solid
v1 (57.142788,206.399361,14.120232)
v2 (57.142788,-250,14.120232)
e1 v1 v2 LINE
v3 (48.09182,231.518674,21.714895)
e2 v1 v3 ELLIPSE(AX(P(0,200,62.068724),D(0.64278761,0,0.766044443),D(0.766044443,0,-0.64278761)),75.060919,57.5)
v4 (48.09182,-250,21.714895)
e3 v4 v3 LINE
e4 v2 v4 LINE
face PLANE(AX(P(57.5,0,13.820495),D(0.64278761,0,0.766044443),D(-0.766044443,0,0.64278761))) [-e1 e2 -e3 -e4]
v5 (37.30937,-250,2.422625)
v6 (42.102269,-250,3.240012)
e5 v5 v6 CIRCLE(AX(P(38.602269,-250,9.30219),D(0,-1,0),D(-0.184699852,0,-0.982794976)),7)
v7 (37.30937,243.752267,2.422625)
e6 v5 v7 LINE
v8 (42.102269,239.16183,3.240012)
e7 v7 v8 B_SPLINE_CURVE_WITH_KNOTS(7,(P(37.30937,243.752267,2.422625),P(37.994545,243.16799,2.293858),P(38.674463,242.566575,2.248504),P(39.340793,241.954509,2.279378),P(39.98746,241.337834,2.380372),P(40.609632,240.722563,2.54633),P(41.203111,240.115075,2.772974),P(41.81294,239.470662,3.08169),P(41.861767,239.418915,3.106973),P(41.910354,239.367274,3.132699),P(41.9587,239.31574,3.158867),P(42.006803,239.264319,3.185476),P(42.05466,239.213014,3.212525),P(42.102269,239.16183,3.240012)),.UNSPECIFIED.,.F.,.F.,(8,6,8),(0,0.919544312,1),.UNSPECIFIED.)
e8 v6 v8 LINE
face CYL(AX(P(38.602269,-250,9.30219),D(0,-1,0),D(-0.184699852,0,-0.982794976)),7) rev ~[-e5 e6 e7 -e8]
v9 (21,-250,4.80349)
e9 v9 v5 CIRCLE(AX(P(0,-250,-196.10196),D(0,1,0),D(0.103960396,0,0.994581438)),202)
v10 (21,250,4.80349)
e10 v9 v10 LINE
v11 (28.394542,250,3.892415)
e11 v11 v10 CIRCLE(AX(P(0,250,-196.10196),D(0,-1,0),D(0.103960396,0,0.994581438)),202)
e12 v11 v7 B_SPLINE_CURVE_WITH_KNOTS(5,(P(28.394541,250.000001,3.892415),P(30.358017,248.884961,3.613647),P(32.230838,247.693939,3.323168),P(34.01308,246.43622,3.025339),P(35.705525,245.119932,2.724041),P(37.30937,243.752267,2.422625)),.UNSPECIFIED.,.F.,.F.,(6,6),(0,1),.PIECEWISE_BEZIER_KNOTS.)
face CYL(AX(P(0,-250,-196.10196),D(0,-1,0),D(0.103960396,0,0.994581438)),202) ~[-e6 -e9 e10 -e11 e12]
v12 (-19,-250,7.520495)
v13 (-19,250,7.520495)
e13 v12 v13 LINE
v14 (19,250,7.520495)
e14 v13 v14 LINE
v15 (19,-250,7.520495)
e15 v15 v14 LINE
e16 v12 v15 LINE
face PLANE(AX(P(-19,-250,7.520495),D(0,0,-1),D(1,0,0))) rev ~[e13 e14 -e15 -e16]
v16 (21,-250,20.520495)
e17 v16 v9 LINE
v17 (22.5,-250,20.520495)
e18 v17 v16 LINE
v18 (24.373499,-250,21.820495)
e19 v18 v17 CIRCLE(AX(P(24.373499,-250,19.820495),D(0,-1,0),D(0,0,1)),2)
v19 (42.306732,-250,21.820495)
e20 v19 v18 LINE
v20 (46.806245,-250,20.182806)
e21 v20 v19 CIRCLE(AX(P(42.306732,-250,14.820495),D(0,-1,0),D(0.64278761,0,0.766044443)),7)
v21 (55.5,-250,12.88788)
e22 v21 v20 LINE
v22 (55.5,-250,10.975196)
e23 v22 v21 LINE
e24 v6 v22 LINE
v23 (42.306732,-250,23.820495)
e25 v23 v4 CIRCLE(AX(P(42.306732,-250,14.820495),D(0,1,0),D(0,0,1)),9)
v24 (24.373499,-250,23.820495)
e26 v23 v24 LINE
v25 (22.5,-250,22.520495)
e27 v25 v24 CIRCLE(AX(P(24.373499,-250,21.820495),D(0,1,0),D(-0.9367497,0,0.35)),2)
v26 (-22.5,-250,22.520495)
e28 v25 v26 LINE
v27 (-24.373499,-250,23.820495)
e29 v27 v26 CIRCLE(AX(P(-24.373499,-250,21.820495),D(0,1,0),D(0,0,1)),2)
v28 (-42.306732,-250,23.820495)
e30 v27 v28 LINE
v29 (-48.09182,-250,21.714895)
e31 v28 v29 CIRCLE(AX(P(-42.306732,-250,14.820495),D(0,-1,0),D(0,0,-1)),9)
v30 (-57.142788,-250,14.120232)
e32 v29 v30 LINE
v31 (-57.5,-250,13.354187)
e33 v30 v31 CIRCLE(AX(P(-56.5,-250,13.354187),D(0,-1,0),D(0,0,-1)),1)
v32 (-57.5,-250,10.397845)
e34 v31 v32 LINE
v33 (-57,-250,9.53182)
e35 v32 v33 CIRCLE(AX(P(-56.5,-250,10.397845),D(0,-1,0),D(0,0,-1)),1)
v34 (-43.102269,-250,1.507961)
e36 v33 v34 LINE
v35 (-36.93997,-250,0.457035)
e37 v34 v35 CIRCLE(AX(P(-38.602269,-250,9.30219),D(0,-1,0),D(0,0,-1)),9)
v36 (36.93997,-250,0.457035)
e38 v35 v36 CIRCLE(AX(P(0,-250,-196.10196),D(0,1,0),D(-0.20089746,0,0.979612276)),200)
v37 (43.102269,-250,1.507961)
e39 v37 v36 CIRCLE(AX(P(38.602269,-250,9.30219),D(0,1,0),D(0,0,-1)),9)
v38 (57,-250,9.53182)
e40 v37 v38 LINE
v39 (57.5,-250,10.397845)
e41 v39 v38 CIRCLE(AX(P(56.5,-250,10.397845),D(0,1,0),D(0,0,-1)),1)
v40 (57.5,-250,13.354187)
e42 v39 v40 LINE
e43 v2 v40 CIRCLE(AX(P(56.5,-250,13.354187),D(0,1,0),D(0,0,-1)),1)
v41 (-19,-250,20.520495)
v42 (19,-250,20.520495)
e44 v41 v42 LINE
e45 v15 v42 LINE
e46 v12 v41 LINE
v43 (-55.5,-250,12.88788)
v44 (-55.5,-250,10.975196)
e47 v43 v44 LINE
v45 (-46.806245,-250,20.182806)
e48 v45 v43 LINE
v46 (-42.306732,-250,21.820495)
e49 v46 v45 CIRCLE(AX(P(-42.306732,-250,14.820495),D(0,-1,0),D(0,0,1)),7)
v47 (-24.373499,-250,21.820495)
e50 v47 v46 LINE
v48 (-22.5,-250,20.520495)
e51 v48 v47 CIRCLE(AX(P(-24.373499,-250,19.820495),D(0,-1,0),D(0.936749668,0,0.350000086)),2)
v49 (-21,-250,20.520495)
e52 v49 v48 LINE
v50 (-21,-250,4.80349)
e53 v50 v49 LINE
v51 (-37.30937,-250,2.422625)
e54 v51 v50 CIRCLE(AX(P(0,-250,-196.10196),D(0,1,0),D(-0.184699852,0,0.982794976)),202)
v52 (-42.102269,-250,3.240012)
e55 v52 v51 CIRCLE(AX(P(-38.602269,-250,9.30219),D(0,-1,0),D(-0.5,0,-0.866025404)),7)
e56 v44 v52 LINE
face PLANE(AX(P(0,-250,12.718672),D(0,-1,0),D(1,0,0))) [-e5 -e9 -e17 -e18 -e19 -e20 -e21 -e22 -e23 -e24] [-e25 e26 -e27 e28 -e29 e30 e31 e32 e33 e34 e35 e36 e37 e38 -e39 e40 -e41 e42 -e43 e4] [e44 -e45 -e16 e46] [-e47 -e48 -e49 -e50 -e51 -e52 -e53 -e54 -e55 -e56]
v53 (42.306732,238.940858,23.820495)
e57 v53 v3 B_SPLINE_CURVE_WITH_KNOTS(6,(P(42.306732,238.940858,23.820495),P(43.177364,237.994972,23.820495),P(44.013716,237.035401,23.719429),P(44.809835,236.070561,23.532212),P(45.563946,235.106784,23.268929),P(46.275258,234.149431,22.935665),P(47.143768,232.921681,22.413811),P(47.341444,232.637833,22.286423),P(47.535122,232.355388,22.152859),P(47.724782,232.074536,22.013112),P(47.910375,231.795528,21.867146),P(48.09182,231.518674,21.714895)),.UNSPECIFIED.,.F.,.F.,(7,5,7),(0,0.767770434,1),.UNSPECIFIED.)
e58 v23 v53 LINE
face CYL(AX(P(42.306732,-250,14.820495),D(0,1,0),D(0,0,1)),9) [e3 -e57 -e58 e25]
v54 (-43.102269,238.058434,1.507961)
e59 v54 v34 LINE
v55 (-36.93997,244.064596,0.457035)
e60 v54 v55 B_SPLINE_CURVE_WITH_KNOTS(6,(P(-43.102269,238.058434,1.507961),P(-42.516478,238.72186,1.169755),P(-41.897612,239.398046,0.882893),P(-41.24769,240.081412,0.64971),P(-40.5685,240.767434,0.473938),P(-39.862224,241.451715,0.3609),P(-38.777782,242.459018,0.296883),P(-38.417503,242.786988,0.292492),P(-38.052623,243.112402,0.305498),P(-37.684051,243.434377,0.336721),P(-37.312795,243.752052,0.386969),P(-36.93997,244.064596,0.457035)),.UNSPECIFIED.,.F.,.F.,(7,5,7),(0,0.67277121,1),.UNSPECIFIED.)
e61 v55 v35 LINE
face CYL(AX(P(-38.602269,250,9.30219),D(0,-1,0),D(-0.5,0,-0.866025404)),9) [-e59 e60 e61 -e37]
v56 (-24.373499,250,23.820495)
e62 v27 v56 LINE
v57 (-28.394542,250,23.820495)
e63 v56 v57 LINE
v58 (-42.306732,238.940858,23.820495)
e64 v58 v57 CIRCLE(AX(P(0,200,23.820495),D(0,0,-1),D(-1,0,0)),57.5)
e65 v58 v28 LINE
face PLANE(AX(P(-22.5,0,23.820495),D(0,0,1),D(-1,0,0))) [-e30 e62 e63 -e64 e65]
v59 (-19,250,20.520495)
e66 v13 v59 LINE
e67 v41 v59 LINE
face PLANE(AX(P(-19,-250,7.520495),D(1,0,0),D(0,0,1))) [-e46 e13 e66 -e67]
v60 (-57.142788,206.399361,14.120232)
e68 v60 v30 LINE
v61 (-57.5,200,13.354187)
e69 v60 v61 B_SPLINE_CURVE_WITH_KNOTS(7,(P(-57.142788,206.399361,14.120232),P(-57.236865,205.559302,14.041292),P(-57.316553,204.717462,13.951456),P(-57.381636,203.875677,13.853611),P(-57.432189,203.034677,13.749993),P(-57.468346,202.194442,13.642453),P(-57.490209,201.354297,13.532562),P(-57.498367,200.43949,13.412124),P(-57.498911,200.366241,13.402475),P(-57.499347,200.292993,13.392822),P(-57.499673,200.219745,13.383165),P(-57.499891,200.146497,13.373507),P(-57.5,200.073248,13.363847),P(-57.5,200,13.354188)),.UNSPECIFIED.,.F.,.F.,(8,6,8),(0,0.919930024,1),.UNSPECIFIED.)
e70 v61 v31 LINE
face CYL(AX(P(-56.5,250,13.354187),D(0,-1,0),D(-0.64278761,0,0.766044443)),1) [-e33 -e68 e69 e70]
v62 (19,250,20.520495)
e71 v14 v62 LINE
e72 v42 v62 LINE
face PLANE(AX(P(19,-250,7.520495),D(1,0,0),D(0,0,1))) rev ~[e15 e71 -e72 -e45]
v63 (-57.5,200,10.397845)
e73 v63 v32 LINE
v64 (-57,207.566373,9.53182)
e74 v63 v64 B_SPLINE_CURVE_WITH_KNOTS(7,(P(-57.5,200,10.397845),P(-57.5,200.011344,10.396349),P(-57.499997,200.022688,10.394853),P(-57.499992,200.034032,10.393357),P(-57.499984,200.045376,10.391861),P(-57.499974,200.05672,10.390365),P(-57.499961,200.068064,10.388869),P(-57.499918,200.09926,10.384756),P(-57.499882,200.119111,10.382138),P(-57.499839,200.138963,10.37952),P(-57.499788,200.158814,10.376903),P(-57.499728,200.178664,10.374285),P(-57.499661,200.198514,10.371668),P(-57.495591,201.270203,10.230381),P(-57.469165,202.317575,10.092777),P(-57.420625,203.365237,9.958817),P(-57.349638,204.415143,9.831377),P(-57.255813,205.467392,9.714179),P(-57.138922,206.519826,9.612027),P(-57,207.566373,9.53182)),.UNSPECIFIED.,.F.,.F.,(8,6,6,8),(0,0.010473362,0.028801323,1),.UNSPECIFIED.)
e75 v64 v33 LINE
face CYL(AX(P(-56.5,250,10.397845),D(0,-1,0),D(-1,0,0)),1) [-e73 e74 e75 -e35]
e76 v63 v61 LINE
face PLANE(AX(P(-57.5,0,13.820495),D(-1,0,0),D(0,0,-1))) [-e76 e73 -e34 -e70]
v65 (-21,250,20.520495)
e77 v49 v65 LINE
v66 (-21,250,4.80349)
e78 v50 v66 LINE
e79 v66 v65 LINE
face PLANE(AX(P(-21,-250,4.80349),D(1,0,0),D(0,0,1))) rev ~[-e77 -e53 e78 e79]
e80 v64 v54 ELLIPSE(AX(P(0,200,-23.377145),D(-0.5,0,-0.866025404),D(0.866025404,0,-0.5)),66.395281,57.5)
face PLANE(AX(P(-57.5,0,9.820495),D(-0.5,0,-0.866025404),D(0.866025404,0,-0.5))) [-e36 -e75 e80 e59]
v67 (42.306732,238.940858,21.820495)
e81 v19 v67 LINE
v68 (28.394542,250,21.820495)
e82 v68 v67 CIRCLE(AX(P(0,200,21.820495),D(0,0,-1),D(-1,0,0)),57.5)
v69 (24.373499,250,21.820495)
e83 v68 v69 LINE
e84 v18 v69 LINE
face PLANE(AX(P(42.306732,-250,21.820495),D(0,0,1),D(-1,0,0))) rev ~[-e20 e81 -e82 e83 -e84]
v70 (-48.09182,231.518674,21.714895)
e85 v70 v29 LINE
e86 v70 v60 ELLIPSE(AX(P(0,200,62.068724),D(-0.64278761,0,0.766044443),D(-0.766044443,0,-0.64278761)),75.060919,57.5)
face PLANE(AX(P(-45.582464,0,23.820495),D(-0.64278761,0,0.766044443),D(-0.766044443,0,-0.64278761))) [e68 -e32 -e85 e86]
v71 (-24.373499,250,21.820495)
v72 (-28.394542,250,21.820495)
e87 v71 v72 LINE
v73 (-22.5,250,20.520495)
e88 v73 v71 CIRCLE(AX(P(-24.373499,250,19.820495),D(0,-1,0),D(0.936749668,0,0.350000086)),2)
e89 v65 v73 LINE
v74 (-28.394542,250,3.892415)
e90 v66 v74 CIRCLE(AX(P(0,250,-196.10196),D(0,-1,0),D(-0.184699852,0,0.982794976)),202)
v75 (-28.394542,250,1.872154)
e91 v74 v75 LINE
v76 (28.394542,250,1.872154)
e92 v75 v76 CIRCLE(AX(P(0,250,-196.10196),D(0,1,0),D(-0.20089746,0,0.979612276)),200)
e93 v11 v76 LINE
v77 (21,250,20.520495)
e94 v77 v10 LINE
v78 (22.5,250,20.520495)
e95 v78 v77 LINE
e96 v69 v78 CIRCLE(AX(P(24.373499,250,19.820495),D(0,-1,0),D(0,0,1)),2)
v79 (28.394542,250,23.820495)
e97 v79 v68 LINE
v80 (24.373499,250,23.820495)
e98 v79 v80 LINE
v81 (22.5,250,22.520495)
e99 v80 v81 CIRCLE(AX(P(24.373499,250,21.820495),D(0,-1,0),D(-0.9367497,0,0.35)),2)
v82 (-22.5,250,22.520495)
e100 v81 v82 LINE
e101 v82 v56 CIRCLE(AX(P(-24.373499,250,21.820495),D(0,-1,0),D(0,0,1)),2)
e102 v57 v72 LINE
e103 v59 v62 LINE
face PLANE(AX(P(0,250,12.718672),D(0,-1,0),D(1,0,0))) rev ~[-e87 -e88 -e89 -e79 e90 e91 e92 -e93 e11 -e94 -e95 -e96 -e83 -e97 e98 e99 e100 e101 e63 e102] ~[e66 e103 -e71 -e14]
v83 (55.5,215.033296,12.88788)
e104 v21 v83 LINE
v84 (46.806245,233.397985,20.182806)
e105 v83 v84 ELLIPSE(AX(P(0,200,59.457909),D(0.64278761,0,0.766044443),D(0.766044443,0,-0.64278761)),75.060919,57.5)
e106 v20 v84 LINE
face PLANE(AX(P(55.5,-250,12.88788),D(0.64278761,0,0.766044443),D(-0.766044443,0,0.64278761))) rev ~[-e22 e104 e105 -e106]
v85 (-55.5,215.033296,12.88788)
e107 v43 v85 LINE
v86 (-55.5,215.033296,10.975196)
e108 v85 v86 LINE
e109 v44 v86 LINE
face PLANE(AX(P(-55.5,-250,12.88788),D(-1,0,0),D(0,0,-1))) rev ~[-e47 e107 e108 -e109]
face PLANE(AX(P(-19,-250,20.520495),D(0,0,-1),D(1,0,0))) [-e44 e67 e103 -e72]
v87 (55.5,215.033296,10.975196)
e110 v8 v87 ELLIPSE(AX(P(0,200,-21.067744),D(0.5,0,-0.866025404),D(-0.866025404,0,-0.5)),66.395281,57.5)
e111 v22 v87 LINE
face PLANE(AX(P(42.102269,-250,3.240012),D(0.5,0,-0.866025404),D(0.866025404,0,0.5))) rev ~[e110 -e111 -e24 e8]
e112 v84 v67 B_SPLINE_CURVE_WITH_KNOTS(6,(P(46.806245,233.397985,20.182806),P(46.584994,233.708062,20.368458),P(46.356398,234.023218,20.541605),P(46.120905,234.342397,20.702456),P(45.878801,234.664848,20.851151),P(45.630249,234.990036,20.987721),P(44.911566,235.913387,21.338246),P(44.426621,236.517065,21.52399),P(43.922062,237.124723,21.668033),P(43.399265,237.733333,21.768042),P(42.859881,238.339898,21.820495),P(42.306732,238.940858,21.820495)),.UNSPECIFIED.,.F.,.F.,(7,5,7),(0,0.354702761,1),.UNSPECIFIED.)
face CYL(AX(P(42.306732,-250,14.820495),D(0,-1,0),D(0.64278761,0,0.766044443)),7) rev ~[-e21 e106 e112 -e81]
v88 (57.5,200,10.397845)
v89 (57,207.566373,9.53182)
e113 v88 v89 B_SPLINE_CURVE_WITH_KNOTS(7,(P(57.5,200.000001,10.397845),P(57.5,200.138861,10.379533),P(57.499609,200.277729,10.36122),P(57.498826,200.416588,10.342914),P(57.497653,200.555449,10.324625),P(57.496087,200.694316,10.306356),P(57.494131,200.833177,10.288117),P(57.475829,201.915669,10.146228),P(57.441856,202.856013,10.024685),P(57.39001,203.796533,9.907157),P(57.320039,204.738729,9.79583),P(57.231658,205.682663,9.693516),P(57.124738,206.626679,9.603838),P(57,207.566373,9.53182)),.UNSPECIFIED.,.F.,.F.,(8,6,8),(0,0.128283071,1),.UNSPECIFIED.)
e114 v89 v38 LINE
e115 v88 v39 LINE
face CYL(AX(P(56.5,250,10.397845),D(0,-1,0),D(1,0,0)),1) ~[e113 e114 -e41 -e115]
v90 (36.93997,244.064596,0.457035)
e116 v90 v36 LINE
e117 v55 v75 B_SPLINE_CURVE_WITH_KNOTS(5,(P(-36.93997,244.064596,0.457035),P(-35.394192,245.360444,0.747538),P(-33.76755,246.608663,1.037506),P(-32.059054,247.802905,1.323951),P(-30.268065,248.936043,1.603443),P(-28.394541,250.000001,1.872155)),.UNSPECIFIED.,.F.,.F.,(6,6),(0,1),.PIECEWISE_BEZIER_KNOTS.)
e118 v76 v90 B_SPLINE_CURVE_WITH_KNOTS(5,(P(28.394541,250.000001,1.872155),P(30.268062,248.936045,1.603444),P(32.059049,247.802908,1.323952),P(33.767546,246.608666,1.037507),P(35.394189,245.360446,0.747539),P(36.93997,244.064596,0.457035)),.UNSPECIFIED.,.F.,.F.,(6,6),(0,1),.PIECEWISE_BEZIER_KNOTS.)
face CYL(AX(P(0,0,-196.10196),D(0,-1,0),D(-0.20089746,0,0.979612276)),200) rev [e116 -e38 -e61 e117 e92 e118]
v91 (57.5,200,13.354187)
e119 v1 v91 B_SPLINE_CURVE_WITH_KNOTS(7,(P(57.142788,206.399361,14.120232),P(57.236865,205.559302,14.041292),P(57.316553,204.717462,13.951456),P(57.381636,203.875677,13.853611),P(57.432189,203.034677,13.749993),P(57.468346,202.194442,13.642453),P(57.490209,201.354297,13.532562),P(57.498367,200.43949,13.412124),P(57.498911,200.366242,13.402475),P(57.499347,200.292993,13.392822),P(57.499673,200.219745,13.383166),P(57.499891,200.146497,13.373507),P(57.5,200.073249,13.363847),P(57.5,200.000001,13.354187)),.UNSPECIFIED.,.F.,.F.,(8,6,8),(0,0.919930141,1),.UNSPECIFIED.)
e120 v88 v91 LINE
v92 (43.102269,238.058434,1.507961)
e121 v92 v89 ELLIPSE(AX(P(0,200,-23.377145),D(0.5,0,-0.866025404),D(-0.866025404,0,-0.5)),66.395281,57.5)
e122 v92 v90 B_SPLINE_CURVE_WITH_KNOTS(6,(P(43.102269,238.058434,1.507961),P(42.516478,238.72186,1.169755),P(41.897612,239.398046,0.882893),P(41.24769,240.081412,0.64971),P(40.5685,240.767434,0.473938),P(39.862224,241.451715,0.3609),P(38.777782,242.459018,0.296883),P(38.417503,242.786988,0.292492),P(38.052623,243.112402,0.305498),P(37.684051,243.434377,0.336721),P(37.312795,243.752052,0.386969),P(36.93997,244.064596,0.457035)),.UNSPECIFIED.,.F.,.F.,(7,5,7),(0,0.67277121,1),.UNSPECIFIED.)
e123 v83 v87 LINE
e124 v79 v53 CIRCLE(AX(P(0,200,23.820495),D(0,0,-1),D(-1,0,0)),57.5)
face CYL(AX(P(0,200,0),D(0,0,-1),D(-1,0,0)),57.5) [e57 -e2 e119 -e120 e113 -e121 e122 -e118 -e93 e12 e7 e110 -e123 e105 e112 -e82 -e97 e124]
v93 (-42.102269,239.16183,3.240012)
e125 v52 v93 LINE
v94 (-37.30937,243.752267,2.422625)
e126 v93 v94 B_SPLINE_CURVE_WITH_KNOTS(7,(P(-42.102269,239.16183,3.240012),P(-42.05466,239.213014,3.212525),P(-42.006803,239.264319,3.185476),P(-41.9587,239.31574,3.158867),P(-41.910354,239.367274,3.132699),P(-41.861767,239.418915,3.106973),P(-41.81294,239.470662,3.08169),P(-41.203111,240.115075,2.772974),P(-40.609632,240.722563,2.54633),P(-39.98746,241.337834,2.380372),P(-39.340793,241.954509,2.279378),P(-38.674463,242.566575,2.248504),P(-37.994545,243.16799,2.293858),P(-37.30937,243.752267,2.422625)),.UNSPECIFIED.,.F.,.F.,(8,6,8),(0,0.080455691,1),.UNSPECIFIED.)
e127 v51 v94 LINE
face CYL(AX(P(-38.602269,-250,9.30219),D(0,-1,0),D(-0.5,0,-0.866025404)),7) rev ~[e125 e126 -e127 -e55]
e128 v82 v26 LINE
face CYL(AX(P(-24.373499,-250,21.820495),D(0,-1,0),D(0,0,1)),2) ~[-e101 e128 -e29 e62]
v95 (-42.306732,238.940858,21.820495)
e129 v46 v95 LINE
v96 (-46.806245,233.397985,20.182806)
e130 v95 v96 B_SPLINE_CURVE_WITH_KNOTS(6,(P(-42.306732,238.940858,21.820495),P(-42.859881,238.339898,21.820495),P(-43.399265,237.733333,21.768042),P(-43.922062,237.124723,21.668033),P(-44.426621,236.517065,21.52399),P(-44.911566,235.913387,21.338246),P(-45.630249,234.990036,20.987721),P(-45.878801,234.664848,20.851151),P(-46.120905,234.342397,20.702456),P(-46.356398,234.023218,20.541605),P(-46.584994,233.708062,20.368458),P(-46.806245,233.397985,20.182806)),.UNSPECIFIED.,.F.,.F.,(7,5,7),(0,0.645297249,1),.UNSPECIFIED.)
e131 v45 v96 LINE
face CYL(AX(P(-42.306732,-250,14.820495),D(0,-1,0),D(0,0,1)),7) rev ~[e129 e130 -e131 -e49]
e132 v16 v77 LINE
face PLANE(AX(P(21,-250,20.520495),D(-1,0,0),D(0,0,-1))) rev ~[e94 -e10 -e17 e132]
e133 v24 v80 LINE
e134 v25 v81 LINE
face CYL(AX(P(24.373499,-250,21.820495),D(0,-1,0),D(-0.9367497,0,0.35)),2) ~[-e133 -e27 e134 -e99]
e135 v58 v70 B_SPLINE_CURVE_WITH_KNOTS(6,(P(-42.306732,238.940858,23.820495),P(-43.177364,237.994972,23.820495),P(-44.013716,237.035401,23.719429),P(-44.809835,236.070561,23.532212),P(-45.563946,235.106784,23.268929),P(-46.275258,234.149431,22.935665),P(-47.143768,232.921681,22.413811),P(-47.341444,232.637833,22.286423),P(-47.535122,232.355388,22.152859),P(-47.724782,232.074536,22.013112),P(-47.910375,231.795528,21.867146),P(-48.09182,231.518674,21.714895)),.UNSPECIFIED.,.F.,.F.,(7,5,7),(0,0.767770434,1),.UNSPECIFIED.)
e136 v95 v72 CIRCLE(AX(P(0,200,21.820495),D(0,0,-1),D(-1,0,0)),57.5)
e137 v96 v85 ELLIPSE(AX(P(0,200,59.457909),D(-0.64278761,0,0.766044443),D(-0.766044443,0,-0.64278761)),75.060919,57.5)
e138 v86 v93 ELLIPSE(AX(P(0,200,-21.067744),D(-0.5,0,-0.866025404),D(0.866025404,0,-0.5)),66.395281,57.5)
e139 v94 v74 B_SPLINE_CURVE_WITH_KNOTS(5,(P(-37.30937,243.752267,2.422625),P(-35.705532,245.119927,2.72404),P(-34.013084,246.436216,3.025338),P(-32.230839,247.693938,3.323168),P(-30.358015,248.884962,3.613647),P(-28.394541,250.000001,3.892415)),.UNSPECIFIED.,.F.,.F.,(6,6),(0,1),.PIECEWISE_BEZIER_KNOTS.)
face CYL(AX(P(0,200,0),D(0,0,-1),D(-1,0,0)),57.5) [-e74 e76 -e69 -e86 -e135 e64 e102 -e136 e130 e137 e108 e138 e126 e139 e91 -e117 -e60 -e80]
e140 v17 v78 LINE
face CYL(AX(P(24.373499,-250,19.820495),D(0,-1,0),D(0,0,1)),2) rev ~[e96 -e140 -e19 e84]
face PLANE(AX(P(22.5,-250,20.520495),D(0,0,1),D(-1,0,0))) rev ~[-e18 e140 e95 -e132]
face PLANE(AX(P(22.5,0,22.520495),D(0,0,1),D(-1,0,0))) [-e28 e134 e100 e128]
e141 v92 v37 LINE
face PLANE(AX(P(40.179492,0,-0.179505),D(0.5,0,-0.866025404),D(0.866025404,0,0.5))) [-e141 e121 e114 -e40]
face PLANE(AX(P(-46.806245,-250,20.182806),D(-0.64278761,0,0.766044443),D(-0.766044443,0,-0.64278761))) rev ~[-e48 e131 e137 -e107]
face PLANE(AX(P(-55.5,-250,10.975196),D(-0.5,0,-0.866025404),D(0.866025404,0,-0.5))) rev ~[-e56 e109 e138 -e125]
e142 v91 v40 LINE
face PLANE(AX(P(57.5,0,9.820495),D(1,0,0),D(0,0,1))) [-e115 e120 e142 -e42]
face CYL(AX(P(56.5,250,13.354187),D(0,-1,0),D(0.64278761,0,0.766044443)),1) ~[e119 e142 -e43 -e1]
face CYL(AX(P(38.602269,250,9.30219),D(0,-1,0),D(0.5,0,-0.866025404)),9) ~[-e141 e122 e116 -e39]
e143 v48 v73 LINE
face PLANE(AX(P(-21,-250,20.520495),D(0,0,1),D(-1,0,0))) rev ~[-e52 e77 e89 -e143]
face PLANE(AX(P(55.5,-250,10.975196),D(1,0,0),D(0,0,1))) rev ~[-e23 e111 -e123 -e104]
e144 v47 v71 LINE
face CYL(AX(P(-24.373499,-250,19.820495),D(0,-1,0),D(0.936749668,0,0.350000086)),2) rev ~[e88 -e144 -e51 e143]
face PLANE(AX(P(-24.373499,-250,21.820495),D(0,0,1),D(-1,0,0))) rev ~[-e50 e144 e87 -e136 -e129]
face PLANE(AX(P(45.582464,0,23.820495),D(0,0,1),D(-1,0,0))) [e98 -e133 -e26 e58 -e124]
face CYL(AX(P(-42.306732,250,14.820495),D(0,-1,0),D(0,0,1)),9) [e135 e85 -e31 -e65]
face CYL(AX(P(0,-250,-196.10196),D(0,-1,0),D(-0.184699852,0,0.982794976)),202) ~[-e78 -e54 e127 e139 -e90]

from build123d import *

# Parameters (mm, degrees)
F1_DEPTH       = 250
F2_W           = 38
F2_H           = 13
F3_DEPTH       = 1200
F5_R           = 9
F6_R           = 1
F9_DEPTH       = 500.001
F11_DEPTH      = 23.8214951236
F11_DEPTH_BACK = 526


# Not quite as in the source:
# - an extrude ends at something that could not be found from the text; its depth is read off the source's solid
# - a feature of the source that left no trace in its solid (it failed there, or was rolled back) is left out


with BuildPart() as f1:
    # F0 (on Front) → F1 (new body, symmetric)
    with BuildSketch(Plane.XZ):
        with BuildLine():
            Line((22.5, 62.3204951236), (0, 62.3204951236))
            Line((0, 62.3204951236), (-22.5, 62.3204951236))
            Line((-22.5, 62.3204951236), (-22.5, 63.6204951236))
            Line((-22.5, 63.6204951236), (-45.5824640741, 63.6204951236))
            Line((-45.5824640741, 63.6204951236), (-57.5, 53.6204951236))
            Line((-57.5, 53.6204951236), (-57.5, 49.6204951236))
            Line((-57.5, 49.6204951236), (-40.1794919243, 39.6204951236))
            ThreePointArc((-40.1794919243, 39.6204951236), (0, 43.698039982), (40.1794919243, 39.6204951236))
            Line((40.1794919243, 39.6204951236), (57.5, 49.6204951236))
            Line((57.5, 49.6204951236), (57.5, 53.6204951236))
            Line((57.5, 53.6204951236), (45.5824640741, 63.6204951236))
            Line((45.5824640741, 63.6204951236), (22.5, 63.6204951236))
            Line((22.5, 63.6204951236), (22.5, 62.3204951236))
        make_face()
    extrude(amount=F1_DEPTH, both=True)

    # F2 (on face) → F3 (cut)
    with BuildSketch(Plane.XZ.offset(250)):
        with Locations((0, 53.8204951236)):
            Rectangle(F2_W, F2_H)
    extrude(amount=-F3_DEPTH, mode=Mode.SUBTRACT)

    # F5
    f5_edges = [f1.edges().sort_by_distance(p)[0] for p in [
        (45.582464, 0, 63.620495),
        (40.179492, 0, 39.620495),
        (-40.179492, 0, 39.620495),
        (-45.582464, 0, 63.620495),
    ]]
    fillet(f5_edges, radius=F5_R)

    # F6
    f6_edges = [f1.edges().sort_by_distance(p)[0] for p in [
        (-57.5, 0, 53.620495),
        (-57.5, 0, 49.620495),
        (57.5, 0, 53.620495),
        (57.5, 0, 49.620495),
    ]]
    fillet(f6_edges, radius=F6_R)


with BuildPart() as f1_1:
    # F7: moved
    add(f1.part.moved(Location((0, 0, -39.8))))

    # F8 (on face) → F9 (cut, through all)
    with BuildSketch(Plane.XZ.offset(250)):
        with BuildLine():
            ThreePointArc((22.5, 22.5204951236), (23.2333239744, 23.4636627961), (24.3734993995, 23.8204951236))
            Line((24.3734993995, 23.8204951236), (22.5, 23.8204951236))
            Line((22.5, 23.8204951236), (22.5, 22.5204951236))
        make_face()
        with BuildLine():
            ThreePointArc((-24.3734993995, 23.8204951236), (-23.2333239744, 23.4636627961), (-22.5, 22.5204951236))
            Line((-22.5, 22.5204951236), (-22.5, 23.8204951236))
            Line((-22.5, 23.8204951236), (-24.3734993995, 23.8204951236))
        make_face()
        with BuildLine():
            ThreePointArc((-42.1022690923, 3.2400121158), (-39.7790673433, 2.4018170628), (-37.3093701274, 2.4226251111))
            ThreePointArc((-37.3093701274, 2.4226251111), (-29.1789785809, 3.779472859), (-21, 4.8034903809))
            Line((-21, 4.8034903809), (-21, 20.5204952508))
            Line((-21, 20.5204952508), (-22.5, 20.5204952508))
            ThreePointArc((-22.5, 20.5204952508), (-23.2333240107, 21.4636628361), (-24.3734993995, 21.8204951236))
            Line((-24.3734993995, 21.8204951236), (-42.3067319657, 21.8204951236))
            ThreePointArc((-42.3067319657, 21.8204951236), (-44.7008729689, 21.3983434691), (-46.8062452335, 20.1828062254))
            Line((-46.8062452335, 20.1828062254), (-55.5, 12.8878798072))
            Line((-55.5, 12.8878798072), (-55.5, 10.9751956619))
            Line((-55.5, 10.9751956619), (-42.1022690923, 3.2400121158))
        make_face()
        with BuildLine():
            ThreePointArc((24.3734993995, 21.8204951236), (23.2333240107, 21.4636628361), (22.5, 20.5204952508))
            Line((22.5, 20.5204952508), (21, 20.5204952508))
            Line((21, 20.5204952508), (21, 4.8034903809))
            ThreePointArc((21, 4.8034903809), (29.1789785809, 3.779472859), (37.3093701274, 2.4226251111))
            ThreePointArc((37.3093701274, 2.4226251111), (39.7790673433, 2.4018170628), (42.1022690923, 3.2400121158))
            Line((42.1022690923, 3.2400121158), (55.5, 10.9751956619))
            Line((55.5, 10.9751956619), (55.5, 12.8878798072))
            Line((55.5, 12.8878798072), (46.8062452335, 20.1828062254))
            ThreePointArc((46.8062452335, 20.1828062254), (44.7008729689, 21.3983434691), (42.3067319657, 21.8204951236))
            Line((42.3067319657, 21.8204951236), (24.3734993995, 21.8204951236))
        make_face()
    extrude(amount=-F9_DEPTH, mode=Mode.SUBTRACT)

    # F10 (on Top) → F11 (cut, two sides)
    with BuildSketch(Plane.XY) as f11_sk:
        with BuildLine():
            ThreePointArc((-57.5, 200), (0, 257.5), (57.5, 200))
            Line((57.5, 200), (57.5, 280))
            Line((57.5, 280), (-57.5, 280))
            Line((-57.5, 280), (-57.5, 200))
        make_face()
    extrude(amount=F11_DEPTH, mode=Mode.SUBTRACT)
    extrude(f11_sk.sketch, amount=-F11_DEPTH_BACK, mode=Mode.SUBTRACT)


solid = f1_1.part
